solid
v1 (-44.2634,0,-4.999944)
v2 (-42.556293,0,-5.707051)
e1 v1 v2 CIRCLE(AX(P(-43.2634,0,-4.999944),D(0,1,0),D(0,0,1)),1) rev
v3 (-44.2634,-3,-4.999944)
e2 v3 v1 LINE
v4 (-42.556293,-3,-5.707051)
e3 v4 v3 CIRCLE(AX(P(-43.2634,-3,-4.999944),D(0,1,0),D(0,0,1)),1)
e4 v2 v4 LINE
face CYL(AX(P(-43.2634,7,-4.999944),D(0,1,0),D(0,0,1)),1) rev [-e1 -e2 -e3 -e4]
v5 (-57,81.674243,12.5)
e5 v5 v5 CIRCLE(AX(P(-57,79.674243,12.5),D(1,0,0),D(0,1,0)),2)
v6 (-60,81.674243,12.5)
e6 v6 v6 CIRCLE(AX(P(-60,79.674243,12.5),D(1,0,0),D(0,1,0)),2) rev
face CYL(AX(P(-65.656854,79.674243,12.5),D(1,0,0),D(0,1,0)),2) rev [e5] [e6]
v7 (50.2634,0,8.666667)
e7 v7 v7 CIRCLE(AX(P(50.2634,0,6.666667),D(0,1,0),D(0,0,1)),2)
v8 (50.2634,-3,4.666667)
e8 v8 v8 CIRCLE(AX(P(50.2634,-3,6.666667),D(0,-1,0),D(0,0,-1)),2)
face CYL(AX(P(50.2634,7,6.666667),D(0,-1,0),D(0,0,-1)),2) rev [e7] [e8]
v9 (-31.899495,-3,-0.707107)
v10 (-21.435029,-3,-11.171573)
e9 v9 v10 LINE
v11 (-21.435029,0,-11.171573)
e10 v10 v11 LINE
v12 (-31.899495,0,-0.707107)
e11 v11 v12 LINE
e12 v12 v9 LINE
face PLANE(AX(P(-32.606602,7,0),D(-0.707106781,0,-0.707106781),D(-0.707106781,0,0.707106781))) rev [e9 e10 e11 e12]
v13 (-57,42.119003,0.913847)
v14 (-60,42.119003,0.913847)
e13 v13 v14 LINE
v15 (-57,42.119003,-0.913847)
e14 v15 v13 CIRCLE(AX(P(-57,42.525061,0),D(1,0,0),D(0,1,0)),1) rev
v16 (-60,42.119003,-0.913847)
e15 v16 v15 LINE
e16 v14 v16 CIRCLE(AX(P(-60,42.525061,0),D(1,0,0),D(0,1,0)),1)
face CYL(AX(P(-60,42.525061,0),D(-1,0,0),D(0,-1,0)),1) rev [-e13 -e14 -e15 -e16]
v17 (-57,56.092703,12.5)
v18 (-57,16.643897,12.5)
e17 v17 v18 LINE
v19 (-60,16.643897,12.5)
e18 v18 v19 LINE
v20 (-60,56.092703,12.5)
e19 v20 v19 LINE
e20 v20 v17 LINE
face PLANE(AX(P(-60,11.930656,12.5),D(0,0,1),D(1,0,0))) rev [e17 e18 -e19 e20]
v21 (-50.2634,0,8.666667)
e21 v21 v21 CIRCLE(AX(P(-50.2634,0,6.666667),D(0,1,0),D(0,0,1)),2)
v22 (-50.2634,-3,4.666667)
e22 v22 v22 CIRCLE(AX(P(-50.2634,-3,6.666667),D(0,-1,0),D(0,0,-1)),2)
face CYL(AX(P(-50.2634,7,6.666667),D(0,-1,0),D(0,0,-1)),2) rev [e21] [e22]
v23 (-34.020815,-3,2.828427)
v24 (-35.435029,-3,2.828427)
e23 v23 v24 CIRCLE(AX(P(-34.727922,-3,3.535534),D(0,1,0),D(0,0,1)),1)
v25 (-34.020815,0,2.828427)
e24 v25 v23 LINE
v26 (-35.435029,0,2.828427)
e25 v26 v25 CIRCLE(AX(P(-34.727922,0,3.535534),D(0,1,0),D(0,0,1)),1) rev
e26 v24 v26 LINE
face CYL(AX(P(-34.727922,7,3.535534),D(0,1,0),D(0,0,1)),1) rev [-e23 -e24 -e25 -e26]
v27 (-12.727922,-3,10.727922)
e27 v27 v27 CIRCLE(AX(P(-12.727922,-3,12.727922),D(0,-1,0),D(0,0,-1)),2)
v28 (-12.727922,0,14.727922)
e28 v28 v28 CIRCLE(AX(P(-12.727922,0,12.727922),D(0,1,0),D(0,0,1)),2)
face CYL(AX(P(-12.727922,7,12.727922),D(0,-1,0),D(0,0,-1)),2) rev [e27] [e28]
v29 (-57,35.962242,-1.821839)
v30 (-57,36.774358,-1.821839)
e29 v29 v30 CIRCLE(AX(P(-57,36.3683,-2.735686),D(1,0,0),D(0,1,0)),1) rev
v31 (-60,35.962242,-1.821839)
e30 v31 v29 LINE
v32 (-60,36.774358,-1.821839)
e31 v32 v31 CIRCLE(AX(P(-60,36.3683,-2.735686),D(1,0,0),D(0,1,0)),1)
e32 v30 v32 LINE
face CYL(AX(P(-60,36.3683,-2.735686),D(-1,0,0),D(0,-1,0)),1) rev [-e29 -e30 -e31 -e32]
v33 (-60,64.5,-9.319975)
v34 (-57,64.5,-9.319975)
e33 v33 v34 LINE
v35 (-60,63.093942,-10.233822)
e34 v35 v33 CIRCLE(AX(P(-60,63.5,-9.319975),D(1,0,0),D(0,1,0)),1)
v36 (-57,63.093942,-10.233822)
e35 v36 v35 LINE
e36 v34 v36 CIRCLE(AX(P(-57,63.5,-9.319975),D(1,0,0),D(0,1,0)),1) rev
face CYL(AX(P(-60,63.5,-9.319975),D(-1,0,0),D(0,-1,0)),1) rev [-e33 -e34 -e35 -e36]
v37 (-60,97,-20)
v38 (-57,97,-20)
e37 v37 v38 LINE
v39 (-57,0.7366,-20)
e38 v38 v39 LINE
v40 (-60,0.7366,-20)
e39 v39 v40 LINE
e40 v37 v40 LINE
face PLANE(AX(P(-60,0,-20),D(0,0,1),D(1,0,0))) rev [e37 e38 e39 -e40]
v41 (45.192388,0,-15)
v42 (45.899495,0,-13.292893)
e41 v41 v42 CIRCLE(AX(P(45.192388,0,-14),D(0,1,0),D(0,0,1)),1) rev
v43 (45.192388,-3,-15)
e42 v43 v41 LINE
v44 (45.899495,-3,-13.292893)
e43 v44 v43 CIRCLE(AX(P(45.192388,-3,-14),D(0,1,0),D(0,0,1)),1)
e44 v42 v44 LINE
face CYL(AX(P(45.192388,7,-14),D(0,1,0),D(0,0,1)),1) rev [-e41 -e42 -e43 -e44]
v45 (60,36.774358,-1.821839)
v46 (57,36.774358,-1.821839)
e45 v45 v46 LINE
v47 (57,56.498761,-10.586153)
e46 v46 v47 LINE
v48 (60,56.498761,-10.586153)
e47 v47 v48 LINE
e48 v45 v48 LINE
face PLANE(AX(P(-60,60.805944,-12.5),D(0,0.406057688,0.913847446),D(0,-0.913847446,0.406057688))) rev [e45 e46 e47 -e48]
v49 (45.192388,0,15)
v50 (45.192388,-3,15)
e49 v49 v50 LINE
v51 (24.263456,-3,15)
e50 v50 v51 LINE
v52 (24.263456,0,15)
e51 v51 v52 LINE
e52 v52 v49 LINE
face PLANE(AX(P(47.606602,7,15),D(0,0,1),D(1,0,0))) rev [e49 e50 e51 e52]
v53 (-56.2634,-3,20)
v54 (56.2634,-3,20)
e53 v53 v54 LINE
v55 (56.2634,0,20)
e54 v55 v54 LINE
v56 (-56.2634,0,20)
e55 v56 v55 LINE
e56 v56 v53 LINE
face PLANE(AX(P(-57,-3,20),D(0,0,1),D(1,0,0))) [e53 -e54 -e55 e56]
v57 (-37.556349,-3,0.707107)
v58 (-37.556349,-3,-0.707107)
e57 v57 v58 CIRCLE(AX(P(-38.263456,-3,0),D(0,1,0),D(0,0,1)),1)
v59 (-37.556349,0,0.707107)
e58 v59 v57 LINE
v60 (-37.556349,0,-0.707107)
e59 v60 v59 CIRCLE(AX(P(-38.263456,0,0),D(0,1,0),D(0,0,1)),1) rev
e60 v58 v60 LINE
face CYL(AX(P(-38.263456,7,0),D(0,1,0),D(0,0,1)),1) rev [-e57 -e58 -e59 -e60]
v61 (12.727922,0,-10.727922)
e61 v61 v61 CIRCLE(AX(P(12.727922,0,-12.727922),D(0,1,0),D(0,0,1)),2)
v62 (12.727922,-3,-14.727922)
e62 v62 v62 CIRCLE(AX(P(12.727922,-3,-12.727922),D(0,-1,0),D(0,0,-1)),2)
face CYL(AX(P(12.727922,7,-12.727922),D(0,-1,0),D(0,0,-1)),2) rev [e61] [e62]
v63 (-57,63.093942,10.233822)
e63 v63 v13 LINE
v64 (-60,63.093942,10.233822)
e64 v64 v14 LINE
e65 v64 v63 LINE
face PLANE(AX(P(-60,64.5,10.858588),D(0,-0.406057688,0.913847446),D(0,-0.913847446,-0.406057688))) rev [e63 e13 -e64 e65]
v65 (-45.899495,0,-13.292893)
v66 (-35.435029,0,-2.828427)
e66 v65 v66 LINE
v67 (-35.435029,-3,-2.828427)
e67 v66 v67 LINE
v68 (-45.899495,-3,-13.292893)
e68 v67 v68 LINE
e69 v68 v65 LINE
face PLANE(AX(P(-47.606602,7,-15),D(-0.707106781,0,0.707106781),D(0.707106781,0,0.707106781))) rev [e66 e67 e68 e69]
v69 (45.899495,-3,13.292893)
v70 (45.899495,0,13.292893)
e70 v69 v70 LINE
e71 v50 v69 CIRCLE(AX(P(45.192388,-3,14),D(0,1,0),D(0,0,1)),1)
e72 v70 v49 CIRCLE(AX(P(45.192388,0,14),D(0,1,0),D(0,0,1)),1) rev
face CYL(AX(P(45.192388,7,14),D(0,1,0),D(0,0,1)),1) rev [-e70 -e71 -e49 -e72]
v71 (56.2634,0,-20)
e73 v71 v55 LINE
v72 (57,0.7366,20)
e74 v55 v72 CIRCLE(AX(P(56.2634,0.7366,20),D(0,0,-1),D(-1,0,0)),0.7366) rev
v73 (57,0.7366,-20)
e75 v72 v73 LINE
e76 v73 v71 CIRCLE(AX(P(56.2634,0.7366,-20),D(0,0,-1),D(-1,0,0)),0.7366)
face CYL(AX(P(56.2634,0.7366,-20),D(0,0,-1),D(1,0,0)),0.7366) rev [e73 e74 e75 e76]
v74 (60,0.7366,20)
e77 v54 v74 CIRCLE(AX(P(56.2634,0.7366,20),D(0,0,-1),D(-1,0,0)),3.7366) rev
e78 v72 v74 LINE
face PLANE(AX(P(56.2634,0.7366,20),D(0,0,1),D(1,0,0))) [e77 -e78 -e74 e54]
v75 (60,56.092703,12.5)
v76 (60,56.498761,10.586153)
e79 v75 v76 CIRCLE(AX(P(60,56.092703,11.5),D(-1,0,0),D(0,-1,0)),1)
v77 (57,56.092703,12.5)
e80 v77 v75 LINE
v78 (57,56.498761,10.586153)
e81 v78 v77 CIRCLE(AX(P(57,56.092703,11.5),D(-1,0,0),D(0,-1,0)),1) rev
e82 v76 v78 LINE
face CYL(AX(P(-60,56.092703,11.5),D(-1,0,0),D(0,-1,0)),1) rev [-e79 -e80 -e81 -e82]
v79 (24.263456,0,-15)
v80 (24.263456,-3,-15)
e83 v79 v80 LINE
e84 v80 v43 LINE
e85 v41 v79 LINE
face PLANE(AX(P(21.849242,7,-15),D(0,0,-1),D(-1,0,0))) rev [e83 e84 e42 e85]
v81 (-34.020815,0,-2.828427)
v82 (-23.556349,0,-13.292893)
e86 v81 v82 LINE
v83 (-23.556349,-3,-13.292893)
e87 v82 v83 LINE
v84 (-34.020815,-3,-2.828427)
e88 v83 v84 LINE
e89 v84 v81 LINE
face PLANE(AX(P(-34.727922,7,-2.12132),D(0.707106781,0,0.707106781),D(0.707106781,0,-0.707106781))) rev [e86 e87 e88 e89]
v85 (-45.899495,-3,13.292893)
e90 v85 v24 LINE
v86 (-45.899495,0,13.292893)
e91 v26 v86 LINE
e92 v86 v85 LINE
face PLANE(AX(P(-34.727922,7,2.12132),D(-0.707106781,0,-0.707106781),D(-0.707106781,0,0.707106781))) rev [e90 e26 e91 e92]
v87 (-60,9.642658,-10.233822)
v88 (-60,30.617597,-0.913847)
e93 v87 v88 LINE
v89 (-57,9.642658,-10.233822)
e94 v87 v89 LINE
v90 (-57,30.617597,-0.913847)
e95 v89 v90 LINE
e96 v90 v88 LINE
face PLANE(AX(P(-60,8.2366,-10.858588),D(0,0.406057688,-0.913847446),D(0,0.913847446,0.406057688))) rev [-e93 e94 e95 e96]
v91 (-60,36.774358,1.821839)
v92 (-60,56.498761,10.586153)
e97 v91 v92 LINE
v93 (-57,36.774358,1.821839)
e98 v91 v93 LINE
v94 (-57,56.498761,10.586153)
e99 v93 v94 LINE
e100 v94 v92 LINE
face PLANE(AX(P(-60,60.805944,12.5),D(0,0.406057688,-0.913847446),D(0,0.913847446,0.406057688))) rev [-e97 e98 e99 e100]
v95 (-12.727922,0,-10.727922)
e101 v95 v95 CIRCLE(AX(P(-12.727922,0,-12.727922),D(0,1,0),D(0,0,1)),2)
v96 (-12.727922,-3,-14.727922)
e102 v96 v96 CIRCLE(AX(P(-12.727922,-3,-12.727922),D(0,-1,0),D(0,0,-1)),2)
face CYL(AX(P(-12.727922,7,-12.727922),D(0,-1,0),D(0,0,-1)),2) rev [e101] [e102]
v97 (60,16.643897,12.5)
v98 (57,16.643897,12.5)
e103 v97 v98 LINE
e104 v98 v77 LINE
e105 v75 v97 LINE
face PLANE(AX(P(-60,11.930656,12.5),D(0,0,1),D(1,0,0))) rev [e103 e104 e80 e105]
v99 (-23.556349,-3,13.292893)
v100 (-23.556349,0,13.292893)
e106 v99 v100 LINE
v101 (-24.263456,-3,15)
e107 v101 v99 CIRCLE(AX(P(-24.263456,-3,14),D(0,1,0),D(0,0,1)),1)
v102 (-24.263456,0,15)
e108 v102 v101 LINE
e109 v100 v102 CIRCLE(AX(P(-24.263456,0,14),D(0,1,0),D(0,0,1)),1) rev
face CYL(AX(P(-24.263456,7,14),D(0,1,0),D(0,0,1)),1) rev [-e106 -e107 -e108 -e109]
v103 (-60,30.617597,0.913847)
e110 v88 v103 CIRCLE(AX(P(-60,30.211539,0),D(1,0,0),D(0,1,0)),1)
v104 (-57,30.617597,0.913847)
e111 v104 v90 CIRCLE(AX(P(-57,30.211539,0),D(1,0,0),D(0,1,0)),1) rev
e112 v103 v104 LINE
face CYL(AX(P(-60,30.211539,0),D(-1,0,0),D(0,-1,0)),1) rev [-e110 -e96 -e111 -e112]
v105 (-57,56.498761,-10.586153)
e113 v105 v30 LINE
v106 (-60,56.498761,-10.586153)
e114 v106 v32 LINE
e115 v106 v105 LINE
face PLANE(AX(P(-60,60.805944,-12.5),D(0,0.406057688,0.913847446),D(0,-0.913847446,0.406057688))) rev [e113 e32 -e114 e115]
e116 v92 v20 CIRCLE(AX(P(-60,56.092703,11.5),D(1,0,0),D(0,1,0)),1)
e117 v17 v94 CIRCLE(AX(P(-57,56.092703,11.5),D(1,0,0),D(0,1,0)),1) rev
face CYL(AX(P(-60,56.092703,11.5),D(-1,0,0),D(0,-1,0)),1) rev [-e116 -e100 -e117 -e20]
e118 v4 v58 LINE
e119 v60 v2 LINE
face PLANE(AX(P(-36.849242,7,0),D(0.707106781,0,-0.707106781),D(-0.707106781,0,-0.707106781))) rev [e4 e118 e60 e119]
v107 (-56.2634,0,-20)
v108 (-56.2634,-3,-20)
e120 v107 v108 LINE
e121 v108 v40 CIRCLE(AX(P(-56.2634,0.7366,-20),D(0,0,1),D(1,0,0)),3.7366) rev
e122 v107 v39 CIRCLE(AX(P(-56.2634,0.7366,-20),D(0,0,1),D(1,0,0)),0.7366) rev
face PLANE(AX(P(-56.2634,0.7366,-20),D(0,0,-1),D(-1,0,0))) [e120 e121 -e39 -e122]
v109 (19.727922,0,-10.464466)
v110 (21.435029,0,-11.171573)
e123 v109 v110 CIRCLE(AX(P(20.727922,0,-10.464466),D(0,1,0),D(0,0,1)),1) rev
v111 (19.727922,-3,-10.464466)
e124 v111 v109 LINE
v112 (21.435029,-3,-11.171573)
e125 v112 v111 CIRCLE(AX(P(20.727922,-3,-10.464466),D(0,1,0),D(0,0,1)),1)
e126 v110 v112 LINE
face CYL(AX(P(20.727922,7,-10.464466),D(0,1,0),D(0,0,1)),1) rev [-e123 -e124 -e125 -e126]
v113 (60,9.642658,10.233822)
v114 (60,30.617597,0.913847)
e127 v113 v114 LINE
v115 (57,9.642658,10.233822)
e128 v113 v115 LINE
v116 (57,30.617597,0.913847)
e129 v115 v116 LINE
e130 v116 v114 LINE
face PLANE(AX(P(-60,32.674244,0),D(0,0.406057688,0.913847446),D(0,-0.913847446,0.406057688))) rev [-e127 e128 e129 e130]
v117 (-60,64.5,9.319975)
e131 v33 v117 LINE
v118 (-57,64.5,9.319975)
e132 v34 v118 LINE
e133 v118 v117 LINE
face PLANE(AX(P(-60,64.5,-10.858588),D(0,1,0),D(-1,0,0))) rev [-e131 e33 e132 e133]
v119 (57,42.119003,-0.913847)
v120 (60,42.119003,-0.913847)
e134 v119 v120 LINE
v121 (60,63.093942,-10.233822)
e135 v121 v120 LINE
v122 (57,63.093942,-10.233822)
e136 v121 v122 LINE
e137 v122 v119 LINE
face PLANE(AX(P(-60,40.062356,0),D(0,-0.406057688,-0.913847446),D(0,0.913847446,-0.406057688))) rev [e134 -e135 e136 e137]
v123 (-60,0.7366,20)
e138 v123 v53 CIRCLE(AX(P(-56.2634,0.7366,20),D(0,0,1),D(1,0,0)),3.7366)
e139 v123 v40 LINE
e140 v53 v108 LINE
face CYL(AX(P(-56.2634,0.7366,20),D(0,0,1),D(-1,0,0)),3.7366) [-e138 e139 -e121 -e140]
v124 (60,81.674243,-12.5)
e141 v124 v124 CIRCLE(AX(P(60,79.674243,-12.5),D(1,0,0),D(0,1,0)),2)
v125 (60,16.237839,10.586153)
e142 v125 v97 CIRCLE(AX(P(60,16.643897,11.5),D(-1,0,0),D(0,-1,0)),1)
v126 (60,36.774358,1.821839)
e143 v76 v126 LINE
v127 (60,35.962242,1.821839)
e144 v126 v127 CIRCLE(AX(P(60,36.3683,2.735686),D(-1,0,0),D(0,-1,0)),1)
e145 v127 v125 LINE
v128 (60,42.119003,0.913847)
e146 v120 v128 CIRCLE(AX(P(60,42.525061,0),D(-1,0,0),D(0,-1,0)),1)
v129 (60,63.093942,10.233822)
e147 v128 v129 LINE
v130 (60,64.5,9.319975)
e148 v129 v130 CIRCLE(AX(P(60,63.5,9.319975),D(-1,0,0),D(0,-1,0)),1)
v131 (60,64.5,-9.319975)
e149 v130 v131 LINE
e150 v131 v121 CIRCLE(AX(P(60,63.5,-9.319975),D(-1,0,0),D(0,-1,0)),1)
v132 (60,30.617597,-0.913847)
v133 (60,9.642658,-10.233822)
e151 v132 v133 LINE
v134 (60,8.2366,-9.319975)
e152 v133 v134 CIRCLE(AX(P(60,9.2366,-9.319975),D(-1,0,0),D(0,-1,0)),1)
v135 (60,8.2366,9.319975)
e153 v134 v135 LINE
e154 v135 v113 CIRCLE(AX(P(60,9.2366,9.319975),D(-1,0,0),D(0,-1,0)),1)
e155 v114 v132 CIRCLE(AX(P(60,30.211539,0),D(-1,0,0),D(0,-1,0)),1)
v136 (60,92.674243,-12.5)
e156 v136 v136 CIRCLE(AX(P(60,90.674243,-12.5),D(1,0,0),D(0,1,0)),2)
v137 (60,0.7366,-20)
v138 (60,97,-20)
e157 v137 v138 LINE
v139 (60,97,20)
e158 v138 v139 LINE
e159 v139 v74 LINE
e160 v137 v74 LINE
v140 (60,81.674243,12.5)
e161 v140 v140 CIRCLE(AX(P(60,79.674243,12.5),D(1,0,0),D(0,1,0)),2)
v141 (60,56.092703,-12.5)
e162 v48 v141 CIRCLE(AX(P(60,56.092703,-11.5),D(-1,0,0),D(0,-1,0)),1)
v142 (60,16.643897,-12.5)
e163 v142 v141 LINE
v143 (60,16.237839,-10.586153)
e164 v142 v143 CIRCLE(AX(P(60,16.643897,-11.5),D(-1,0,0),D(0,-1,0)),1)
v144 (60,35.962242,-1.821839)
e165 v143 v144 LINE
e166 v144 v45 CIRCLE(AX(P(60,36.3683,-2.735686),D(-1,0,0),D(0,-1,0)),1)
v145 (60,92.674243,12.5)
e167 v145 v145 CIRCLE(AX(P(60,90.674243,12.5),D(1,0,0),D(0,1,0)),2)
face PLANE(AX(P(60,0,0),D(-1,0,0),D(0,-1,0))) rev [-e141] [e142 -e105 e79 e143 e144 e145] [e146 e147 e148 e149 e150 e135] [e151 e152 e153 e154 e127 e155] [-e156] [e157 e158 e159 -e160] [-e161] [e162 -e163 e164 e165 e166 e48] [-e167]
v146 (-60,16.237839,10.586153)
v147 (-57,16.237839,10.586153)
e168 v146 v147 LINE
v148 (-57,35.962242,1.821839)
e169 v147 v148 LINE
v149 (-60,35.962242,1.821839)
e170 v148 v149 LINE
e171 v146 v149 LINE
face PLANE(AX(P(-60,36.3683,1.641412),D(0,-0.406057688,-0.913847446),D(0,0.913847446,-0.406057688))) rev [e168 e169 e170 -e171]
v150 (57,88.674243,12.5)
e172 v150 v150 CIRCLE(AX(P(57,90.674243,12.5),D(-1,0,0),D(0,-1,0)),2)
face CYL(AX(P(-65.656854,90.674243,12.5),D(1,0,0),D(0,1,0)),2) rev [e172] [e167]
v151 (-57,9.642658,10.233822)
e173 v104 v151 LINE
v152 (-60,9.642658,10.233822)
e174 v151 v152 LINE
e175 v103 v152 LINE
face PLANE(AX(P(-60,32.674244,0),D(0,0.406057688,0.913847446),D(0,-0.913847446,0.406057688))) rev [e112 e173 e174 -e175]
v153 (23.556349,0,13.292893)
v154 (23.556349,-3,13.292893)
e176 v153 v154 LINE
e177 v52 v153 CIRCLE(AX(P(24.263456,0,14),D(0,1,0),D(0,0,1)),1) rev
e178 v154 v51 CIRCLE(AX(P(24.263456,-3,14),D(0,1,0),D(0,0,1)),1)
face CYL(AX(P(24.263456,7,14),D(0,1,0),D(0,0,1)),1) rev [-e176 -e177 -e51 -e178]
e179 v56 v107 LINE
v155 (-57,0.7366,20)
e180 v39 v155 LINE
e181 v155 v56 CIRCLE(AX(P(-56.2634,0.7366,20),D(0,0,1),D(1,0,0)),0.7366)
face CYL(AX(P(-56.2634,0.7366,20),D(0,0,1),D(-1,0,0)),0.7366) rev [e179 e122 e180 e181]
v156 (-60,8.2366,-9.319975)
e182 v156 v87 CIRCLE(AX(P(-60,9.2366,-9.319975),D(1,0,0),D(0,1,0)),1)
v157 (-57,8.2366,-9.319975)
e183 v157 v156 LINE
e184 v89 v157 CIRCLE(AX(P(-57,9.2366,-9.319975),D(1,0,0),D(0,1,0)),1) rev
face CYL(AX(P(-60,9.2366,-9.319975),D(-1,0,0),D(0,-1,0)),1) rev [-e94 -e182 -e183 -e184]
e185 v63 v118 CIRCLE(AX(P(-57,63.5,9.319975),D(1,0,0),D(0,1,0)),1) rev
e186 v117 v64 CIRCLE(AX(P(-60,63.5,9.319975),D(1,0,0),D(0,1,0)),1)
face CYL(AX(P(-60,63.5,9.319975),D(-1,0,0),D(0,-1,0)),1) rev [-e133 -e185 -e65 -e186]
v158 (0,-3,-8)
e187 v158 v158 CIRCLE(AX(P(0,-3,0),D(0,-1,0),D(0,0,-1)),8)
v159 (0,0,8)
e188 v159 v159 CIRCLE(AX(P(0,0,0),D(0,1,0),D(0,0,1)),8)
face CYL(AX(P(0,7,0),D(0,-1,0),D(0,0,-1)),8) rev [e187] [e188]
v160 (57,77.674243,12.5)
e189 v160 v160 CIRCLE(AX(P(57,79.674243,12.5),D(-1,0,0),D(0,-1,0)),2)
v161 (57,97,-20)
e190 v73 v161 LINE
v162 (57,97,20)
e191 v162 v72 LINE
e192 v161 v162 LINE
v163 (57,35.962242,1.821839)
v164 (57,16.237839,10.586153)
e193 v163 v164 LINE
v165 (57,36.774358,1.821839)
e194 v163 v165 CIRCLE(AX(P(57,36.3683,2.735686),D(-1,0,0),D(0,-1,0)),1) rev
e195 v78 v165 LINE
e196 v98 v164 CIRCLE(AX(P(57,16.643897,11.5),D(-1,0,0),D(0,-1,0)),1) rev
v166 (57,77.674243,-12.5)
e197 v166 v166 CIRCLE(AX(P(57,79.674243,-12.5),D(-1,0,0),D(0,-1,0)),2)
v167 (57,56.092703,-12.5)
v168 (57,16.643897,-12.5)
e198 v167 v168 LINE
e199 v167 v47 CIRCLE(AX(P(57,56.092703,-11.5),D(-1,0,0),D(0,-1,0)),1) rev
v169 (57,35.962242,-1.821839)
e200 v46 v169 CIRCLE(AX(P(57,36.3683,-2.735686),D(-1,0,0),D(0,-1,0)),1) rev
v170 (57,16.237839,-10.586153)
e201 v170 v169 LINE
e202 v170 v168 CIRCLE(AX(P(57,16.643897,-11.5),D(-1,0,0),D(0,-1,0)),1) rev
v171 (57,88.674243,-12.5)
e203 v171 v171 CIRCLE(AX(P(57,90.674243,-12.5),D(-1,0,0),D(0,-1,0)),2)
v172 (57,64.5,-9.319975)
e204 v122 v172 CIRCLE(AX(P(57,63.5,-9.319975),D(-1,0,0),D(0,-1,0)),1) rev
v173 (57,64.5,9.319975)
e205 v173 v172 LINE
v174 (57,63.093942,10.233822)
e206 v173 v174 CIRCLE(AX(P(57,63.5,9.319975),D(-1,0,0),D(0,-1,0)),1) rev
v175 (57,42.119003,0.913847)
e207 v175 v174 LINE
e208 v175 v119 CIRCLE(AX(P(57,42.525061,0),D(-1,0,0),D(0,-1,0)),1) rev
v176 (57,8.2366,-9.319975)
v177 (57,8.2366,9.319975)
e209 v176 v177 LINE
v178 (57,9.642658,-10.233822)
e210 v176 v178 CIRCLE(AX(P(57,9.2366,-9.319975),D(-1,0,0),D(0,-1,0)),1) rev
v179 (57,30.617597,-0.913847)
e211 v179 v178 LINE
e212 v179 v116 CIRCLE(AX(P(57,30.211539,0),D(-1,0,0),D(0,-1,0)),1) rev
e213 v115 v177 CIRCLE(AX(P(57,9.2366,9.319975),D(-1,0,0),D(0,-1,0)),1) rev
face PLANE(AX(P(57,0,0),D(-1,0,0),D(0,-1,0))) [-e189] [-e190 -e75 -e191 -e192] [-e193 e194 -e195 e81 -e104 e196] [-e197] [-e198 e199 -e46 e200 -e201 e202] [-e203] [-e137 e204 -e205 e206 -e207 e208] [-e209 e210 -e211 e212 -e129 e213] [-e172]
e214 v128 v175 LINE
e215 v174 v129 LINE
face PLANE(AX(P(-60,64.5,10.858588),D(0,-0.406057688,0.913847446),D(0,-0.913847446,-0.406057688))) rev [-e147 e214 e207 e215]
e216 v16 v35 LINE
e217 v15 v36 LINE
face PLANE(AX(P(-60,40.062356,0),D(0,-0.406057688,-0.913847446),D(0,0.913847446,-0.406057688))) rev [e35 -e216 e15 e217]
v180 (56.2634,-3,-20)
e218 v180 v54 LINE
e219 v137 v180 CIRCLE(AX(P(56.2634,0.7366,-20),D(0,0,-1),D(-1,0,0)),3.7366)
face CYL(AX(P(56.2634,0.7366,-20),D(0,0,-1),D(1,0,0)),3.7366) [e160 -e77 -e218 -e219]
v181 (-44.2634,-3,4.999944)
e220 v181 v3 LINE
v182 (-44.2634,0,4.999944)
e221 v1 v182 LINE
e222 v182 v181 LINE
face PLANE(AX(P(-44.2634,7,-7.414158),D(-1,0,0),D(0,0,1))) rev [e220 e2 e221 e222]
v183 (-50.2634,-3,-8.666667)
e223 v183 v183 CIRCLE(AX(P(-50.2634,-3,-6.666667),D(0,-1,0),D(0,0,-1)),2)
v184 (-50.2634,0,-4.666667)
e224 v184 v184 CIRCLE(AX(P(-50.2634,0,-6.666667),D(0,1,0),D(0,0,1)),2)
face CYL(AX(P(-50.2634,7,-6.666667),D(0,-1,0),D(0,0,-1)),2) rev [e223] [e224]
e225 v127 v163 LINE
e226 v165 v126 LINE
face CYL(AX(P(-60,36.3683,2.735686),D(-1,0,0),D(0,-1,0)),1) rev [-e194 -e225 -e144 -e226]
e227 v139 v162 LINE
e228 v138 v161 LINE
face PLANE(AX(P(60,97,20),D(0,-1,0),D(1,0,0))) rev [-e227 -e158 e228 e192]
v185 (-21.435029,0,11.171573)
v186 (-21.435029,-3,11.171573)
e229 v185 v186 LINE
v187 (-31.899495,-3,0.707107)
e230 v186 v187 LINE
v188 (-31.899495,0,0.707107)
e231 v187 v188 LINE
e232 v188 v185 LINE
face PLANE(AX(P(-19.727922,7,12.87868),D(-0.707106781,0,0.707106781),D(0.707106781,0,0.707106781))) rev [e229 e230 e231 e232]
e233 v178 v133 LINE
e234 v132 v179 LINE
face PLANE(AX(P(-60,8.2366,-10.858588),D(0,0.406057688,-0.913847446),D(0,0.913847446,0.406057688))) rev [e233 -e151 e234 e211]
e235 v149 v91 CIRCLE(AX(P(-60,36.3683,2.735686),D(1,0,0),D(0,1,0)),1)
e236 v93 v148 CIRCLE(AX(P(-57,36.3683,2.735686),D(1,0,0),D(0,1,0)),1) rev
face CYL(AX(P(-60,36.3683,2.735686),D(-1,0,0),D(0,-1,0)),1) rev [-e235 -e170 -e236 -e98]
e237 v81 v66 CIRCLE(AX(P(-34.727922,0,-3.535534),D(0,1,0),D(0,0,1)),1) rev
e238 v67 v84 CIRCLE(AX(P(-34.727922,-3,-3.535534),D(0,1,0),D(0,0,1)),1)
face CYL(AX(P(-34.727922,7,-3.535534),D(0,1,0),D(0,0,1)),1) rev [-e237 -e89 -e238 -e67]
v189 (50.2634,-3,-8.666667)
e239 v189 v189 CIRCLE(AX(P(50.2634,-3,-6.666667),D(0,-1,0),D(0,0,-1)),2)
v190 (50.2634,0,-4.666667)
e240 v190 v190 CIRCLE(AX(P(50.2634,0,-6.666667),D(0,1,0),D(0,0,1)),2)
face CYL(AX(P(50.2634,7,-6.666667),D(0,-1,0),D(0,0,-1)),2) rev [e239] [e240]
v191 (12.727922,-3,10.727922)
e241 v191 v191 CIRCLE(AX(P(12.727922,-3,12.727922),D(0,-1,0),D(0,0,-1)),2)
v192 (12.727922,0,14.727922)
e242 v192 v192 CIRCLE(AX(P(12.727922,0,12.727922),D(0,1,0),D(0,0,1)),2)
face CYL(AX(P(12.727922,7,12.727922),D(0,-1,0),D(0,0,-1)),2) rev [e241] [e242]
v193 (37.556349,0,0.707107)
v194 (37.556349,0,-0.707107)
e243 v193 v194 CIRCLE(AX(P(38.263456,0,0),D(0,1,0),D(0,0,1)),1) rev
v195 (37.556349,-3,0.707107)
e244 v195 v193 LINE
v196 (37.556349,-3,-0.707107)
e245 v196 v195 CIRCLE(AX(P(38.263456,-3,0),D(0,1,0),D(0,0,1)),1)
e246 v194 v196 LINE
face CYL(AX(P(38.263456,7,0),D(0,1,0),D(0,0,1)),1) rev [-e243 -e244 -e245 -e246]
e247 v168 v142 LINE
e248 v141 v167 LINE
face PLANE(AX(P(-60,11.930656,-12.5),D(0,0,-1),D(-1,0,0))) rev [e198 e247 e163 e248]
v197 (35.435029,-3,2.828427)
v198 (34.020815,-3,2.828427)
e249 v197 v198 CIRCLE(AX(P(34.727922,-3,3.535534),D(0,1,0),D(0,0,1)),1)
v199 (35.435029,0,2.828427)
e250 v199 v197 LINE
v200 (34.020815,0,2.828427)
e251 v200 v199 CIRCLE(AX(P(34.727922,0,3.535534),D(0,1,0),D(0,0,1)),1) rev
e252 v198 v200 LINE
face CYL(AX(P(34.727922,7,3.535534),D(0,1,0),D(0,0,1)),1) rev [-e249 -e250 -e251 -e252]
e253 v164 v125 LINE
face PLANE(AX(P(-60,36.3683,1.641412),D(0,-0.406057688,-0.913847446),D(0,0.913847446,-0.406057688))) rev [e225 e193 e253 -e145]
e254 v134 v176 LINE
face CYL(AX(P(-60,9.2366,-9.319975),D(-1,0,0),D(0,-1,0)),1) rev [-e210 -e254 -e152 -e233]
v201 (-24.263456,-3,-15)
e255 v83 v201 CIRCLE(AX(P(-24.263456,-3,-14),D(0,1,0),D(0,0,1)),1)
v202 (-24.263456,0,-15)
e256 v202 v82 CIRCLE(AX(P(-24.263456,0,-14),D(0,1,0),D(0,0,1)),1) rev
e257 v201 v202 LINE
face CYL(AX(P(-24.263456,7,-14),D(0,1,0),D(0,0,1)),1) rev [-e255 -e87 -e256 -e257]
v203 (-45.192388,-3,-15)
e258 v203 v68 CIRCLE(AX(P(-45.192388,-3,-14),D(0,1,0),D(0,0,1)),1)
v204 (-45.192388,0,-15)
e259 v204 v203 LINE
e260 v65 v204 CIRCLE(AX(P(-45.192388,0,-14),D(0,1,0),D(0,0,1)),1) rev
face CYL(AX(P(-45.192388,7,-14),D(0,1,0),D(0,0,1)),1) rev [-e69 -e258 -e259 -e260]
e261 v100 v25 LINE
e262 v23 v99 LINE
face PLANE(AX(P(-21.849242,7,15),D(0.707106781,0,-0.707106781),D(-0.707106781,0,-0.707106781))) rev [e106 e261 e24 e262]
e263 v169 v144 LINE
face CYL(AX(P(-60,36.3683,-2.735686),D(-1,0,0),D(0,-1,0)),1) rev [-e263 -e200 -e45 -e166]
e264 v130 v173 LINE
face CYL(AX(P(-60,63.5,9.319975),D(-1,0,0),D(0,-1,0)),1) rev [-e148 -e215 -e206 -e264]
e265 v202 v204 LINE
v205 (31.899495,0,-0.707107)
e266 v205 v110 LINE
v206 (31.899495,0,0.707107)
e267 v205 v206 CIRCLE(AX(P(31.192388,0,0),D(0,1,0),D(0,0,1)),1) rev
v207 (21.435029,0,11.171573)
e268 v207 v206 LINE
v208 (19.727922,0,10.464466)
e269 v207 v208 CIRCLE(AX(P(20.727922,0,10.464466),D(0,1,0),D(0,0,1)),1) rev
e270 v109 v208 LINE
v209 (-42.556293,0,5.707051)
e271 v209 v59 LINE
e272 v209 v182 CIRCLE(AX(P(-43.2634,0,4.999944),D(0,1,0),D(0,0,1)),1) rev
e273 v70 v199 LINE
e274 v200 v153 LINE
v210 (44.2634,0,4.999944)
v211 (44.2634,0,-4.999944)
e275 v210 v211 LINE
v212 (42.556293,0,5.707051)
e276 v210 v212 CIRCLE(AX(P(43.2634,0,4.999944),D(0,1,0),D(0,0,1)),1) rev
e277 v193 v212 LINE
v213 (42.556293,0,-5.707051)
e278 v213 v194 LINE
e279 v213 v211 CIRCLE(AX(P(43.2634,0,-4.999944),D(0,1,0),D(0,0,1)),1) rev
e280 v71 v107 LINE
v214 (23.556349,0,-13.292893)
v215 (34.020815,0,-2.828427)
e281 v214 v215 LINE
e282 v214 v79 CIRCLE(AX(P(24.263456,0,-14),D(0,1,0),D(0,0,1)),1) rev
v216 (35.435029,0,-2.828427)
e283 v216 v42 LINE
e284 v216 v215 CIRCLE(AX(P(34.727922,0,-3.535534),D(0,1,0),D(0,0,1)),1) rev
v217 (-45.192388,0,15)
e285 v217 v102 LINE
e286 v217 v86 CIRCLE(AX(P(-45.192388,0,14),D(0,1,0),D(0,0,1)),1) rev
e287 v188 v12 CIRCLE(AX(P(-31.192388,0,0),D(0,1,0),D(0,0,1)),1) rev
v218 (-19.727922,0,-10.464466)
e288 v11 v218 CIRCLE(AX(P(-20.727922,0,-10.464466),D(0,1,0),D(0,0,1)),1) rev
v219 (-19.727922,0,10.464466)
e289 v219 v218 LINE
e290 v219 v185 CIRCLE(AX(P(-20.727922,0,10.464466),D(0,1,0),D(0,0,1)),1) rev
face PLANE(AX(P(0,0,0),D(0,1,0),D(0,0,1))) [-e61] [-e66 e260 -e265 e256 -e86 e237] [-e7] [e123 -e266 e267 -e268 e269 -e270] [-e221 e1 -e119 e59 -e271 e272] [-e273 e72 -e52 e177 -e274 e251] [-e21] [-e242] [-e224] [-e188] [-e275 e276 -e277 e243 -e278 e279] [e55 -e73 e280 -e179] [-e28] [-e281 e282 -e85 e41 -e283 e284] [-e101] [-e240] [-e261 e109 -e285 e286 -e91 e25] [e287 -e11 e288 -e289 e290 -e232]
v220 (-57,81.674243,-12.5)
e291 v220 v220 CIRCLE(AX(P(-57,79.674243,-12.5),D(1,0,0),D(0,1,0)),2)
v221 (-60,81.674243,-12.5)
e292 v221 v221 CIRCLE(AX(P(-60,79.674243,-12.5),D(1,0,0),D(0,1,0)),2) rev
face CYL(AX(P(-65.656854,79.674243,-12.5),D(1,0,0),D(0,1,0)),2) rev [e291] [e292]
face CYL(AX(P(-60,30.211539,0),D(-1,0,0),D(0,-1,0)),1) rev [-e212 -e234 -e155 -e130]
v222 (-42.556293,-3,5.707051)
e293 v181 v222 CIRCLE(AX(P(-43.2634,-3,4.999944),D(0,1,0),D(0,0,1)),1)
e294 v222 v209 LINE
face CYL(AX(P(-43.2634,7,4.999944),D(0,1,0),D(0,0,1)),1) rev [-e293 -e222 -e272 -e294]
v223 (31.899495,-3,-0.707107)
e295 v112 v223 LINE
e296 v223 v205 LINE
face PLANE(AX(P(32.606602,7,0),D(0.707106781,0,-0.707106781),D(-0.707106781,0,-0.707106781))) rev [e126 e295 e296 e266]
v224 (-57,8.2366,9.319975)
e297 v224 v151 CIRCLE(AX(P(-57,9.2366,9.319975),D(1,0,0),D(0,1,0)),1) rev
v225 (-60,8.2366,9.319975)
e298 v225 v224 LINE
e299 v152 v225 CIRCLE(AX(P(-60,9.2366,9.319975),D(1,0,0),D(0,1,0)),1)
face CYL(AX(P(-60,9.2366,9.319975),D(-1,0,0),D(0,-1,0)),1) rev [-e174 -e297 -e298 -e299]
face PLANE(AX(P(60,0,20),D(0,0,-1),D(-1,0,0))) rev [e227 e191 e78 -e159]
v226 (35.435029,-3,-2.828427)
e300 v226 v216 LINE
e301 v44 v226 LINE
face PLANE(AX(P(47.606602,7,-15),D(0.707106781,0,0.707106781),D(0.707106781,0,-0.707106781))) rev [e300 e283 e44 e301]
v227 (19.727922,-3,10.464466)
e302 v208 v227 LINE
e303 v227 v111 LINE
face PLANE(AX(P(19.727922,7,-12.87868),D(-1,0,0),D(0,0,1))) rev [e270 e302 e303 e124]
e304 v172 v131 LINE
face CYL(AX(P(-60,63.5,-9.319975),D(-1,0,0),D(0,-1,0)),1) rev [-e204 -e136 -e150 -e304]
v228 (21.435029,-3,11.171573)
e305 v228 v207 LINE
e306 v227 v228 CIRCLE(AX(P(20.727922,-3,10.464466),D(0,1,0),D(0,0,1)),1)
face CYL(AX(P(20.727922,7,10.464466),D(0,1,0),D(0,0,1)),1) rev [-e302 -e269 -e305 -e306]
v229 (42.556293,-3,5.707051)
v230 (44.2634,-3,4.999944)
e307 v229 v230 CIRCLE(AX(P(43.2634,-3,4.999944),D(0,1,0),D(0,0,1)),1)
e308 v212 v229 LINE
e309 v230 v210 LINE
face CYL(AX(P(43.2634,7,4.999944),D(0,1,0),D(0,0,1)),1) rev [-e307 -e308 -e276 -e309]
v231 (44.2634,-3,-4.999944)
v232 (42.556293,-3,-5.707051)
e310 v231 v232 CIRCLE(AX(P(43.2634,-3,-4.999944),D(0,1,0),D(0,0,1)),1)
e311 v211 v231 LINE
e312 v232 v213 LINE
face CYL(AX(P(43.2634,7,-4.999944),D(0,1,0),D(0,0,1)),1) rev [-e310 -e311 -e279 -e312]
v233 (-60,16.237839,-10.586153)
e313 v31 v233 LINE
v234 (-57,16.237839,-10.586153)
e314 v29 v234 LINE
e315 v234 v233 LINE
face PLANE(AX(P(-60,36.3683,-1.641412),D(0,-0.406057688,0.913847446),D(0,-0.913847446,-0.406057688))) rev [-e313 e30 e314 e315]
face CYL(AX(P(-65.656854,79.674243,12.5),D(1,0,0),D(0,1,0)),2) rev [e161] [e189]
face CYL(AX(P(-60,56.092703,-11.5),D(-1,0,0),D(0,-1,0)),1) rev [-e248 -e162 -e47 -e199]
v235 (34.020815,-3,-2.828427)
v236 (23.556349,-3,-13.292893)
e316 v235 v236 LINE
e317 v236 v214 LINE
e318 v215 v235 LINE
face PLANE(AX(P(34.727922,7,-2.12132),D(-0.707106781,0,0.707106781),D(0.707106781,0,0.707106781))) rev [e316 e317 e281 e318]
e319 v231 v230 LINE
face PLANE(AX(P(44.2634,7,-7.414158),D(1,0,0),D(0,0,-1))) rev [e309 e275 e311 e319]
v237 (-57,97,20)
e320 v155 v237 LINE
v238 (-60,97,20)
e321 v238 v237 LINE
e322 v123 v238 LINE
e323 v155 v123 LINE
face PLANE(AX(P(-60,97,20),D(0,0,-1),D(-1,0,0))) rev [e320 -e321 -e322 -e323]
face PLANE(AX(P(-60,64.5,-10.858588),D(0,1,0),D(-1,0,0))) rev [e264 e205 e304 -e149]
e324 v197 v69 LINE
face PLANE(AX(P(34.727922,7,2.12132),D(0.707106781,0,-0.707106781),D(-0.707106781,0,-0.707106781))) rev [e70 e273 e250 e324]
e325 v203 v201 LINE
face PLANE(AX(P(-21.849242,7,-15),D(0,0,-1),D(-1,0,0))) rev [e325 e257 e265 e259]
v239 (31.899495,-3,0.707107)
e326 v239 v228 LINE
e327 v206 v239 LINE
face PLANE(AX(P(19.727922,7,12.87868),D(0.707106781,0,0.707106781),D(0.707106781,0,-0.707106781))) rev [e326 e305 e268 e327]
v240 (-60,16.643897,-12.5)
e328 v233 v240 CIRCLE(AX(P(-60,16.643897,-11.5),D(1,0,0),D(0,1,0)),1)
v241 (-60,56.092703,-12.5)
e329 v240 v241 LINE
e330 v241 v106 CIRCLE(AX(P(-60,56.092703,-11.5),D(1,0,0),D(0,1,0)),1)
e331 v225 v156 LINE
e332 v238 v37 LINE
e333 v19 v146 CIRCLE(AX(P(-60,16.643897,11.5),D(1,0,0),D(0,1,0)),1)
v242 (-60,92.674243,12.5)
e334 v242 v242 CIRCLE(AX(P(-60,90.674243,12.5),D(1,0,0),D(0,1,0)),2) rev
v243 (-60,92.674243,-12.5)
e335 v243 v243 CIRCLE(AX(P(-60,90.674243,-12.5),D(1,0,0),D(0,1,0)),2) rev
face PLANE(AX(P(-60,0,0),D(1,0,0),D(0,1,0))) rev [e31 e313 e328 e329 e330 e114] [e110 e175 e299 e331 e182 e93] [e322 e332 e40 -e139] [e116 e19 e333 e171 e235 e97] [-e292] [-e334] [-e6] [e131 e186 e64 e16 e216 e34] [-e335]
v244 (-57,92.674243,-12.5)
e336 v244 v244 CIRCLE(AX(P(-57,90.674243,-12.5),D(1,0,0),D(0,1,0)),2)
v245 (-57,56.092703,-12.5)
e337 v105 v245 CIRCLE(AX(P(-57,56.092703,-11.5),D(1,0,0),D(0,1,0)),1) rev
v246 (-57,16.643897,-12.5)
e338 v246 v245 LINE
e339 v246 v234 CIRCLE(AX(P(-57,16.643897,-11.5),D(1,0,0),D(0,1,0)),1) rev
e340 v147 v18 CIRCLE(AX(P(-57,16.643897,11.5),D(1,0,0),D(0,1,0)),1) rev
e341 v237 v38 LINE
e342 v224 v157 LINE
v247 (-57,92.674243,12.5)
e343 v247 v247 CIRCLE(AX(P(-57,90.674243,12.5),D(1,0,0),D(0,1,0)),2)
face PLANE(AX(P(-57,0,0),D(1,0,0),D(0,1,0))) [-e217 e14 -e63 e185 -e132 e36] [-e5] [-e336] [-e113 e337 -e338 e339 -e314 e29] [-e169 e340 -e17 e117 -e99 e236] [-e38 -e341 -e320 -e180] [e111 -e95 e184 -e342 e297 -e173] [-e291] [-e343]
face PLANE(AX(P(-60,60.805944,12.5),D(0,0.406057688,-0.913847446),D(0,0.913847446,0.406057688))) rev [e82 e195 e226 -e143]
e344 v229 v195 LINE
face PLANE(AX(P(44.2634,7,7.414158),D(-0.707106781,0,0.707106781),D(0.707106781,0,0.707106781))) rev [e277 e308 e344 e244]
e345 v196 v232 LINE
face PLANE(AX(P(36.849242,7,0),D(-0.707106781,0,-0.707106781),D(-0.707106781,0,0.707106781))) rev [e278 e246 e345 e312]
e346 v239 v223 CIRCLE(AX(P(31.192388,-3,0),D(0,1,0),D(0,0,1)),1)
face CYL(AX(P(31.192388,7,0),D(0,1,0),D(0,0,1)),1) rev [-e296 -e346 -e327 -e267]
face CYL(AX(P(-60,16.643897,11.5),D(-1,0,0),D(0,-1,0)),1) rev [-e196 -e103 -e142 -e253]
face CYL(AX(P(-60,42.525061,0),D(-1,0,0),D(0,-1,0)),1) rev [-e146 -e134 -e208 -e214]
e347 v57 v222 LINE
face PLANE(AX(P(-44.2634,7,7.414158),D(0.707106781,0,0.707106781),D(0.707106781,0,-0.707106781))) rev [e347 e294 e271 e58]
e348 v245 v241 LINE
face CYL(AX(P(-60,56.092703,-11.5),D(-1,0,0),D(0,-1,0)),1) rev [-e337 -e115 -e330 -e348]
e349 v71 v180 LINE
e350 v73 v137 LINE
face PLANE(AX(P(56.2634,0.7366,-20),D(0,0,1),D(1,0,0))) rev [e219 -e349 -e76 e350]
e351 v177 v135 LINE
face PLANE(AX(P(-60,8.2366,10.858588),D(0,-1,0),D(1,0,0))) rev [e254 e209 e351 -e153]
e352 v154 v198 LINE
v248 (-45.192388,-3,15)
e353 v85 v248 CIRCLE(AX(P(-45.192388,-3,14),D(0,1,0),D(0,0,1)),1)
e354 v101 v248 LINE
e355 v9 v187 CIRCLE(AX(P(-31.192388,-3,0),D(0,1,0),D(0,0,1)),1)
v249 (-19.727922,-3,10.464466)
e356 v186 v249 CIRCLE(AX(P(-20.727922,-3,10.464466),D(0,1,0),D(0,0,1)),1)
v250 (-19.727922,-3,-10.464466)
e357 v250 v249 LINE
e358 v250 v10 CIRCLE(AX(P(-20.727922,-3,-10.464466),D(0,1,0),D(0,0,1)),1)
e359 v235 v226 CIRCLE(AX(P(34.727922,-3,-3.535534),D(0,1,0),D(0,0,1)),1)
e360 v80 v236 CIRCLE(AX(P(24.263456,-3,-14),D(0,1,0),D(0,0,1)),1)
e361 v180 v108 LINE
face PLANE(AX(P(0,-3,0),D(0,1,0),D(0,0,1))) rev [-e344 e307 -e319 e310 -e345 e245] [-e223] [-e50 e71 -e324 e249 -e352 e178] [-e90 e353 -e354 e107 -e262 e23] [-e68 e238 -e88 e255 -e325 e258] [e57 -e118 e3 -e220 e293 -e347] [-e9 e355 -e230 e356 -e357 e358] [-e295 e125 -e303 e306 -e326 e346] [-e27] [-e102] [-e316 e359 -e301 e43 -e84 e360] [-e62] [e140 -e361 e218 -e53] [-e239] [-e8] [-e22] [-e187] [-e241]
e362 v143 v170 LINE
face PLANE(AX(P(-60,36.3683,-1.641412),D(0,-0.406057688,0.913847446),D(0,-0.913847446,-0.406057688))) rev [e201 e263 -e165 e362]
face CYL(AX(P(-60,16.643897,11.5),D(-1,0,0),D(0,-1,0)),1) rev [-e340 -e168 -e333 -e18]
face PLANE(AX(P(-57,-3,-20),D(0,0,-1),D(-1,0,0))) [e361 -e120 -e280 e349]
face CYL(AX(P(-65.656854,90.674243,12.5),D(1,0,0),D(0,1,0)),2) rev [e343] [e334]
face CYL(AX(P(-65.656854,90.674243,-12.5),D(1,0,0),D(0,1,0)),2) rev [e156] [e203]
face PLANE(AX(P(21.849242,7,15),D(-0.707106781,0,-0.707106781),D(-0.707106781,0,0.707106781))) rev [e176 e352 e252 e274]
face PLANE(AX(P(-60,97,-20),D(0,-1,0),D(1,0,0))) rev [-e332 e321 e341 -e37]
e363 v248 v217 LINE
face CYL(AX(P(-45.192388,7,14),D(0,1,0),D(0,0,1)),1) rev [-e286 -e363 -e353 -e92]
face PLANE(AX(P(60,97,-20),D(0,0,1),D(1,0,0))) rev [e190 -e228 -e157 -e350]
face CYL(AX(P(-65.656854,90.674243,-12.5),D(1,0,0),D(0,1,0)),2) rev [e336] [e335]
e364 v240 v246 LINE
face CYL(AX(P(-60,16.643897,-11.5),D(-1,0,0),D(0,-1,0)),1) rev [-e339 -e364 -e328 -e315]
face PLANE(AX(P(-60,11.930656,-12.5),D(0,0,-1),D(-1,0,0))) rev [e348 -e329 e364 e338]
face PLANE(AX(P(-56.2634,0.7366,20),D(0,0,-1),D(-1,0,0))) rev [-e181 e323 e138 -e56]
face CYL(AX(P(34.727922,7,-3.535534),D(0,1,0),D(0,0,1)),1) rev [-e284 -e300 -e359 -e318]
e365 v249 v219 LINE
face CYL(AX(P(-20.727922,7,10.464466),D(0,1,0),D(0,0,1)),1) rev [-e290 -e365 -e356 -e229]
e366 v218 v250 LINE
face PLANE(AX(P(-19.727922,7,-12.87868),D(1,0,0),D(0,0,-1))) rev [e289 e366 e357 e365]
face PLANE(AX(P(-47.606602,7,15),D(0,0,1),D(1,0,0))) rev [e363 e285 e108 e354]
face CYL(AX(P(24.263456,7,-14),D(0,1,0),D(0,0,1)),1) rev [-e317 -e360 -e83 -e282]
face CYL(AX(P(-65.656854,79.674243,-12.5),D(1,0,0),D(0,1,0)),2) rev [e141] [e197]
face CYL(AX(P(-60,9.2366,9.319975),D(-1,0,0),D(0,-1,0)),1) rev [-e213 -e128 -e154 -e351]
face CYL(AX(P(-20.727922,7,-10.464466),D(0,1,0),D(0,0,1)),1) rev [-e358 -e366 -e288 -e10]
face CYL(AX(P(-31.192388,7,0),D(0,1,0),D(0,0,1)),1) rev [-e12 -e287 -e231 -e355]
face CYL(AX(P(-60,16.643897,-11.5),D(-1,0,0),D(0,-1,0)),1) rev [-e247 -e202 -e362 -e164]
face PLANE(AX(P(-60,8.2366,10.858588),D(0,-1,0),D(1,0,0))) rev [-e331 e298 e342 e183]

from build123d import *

# Parameters (mm, degrees)
SKETCH3_W                    = 114
SKETCH3_H                    = 40
BASE_FLANGE1_DEPTH           = 3
EDGE_FLANGE1_STRIP_W         = 13.4732
EDGE_FLANGE1_STRIP_H         = 3
EDGE_FLANGE1_STRIP_CUT_DEPTH = 40
EDGE_FLANGE1_DEPTH           = 40
EDGE_FLANGE2_STRIP_W         = 13.4732
EDGE_FLANGE2_STRIP_H         = 3
EDGE_FLANGE2_STRIP_CUT_DEPTH = 40
EDGE_FLANGE2_DEPTH           = 40
SKETCH11_R                   = 8
SKETCH11_R_2                 = 2
CUT_EXTRUDE1_DEPTH           = 10
CUT_EXTRUDE2_REACH           = 157.592
SKETCH12_R                   = 2
CUT_EXTRUDE3_DEPTH           = 156.592416268
CUT_EXTRUDE3_DEPTH_BACK      = 156.592416268
CUT_EXTRUDE4_DEPTH           = 10
FILLET1_R                    = 1


# Sheet-metal steps are written as plain solids
with BuildPart() as part:
    # Sketch3 → Base-Flange1 (new body)
    with BuildSketch(Plane(origin=(0, 0, 0), x_dir=(1, 0, 0), z_dir=(0, 1, 0))):
        Rectangle(SKETCH3_W, SKETCH3_H)
    extrude(amount=-BASE_FLANGE1_DEPTH)

    # Edge-Flange1 strip (across the edge) → Edge-Flange1 strip cut (cut)
    with BuildSketch(Plane(origin=(-57, 0, -20), x_dir=(1, 0, 0), z_dir=(0, 0, 1))):
        with Locations((-6, -1.5)):
            Rectangle(EDGE_FLANGE1_STRIP_W, EDGE_FLANGE1_STRIP_H)
    extrude(amount=EDGE_FLANGE1_STRIP_CUT_DEPTH, mode=Mode.SUBTRACT)

    # Edge-Flange1 section (across the edge) → Edge-Flange1 (add)
    with BuildSketch(Plane(origin=(-57, 0, -20), x_dir=(1, 0, 0), z_dir=(0, 0, 1))):
        with BuildLine():
            Line((-3, 0.7366), (-3, 97))
            Line((-3, 97), (0, 97))
            Line((0, 97), (0, 0.7366))
            ThreePointArc((0, 0.7366), (0.215745145, 0.215745145), (0.7366, 0))
            Line((0.7366, 0), (0.7366, -3))
            ThreePointArc((0.7366, -3), (-1.905575199, -1.905575199), (-3, 0.7366))
        make_face()
    extrude(amount=EDGE_FLANGE1_DEPTH)

    # Edge-Flange2 strip (across the edge) → Edge-Flange2 strip cut (cut)
    with BuildSketch(Plane(origin=(57, 0, 20), x_dir=(-1, 0, 0), z_dir=(0, 0, -1))):
        with Locations((-6, -1.5)):
            Rectangle(EDGE_FLANGE2_STRIP_W, EDGE_FLANGE2_STRIP_H)
    extrude(amount=EDGE_FLANGE2_STRIP_CUT_DEPTH, mode=Mode.SUBTRACT)

    # Edge-Flange2 section (across the edge) → Edge-Flange2 (add)
    with BuildSketch(Plane(origin=(57, 0, 20), x_dir=(-1, 0, 0), z_dir=(0, 0, -1))):
        with BuildLine():
            Line((-3, 0.7366), (-3, 97))
            Line((-3, 97), (0, 97))
            Line((0, 97), (0, 0.7366))
            ThreePointArc((0, 0.7366), (0.215745145, 0.215745145), (0.7366, 0))
            Line((0.7366, 0), (0.7366, -3))
            ThreePointArc((0.7366, -3), (-1.905575199, -1.905575199), (-3, 0.7366))
        make_face()
    extrude(amount=EDGE_FLANGE2_DEPTH)

    # Sketch11 → Cut-Extrude1 (cut)
    with BuildSketch(Plane(origin=(0, -3, 0), x_dir=(-1, 0, 0), z_dir=(0, -1, 0))):
        with Locations(Location((0, 0, 0), (0, 0, 90))):
            Circle(SKETCH11_R)
        with Locations(Location((12.727922061, 12.727922061, 0), (0, 0, 90))):
            Circle(SKETCH11_R_2)
        with Locations(Location((12.727922061, -12.727922061, 0), (0, 0, 90))):
            Circle(SKETCH11_R_2)
        with Locations(Location((-12.727922061, -12.727922061, 0), (0, 0, 90))):
            Circle(SKETCH11_R_2)
        with Locations(Location((-12.727922061, 12.727922061, 0), (0, 0, 90))):
            Circle(SKETCH11_R_2)
        with Locations(Location((50.2634, 6.666666667, 0), (0, 0, 90))):
            Circle(SKETCH11_R_2)
        with Locations(Location((-50.2634, 6.666666667, 0), (0, 0, 90))):
            Circle(SKETCH11_R_2)
        with Locations(Location((50.2634, -6.666666667, 0), (0, 0, 90))):
            Circle(SKETCH11_R_2)
        with Locations(Location((-50.2634, -6.666666667, 0), (0, 0, 90))):
            Circle(SKETCH11_R_2)
    extrude(amount=-CUT_EXTRUDE1_DEPTH, mode=Mode.SUBTRACT)

    # Cut-Extrude2: up to this face of the body (flat: up to its plane)
    cut_extrude2_end = Plane(part.part.faces().sort_by_distance((-60, 48.8683, 0))[0])
    # Sketch12 → Cut-Extrude2 (cut, up to the picked face)
    with BuildSketch(Plane(origin=(60, 0, 0), x_dir=(0, 0, -1), z_dir=(1, 0, 0)), mode=Mode.PRIVATE) as cut_extrude2_sk1:
        with Locations(Location((12.5, 79.674243403, 0), (0, 0, 90))):
            Circle(SKETCH12_R)
    cut_extrude2_tool1 = split(extrude(cut_extrude2_sk1.sketch, amount=-CUT_EXTRUDE2_REACH, mode=Mode.PRIVATE), bisect_by=cut_extrude2_end, keep=Keep.BOTH, mode=Mode.PRIVATE)
    # Sketch12 → Cut-Extrude2 (cut, up to the picked face)
    with BuildSketch(Plane(origin=(60, 0, 0), x_dir=(0, 0, -1), z_dir=(1, 0, 0)), mode=Mode.PRIVATE) as cut_extrude2_sk2:
        with Locations(Location((12.5, 90.674243403, 0), (0, 0, 90))):
            Circle(SKETCH12_R)
    cut_extrude2_tool2 = split(extrude(cut_extrude2_sk2.sketch, amount=-CUT_EXTRUDE2_REACH, mode=Mode.PRIVATE), bisect_by=cut_extrude2_end, keep=Keep.BOTH, mode=Mode.PRIVATE)
    # Sketch12 → Cut-Extrude2 (cut, up to the picked face)
    with BuildSketch(Plane(origin=(60, 0, 0), x_dir=(0, 0, -1), z_dir=(1, 0, 0)), mode=Mode.PRIVATE) as cut_extrude2_sk3:
        with Locations(Location((-12.5, 79.674243403, 0), (0, 0, 90))):
            Circle(SKETCH12_R)
    cut_extrude2_tool3 = split(extrude(cut_extrude2_sk3.sketch, amount=-CUT_EXTRUDE2_REACH, mode=Mode.PRIVATE), bisect_by=cut_extrude2_end, keep=Keep.BOTH, mode=Mode.PRIVATE)
    # Sketch12 → Cut-Extrude2 (cut, up to the picked face)
    with BuildSketch(Plane(origin=(60, 0, 0), x_dir=(0, 0, -1), z_dir=(1, 0, 0)), mode=Mode.PRIVATE) as cut_extrude2_sk4:
        with Locations(Location((-12.5, 90.674243403, 0), (0, 0, 90))):
            Circle(SKETCH12_R)
    cut_extrude2_tool4 = split(extrude(cut_extrude2_sk4.sketch, amount=-CUT_EXTRUDE2_REACH, mode=Mode.PRIVATE), bisect_by=cut_extrude2_end, keep=Keep.BOTH, mode=Mode.PRIVATE)
    add(cut_extrude2_tool1.solids().sort_by(Axis((60, 79.674243, -12.5), (-1, 0, 0)))[0], mode=Mode.SUBTRACT)
    add(cut_extrude2_tool2.solids().sort_by(Axis((60, 90.674243, -12.5), (-1, 0, 0)))[0], mode=Mode.SUBTRACT)
    add(cut_extrude2_tool3.solids().sort_by(Axis((60, 79.674243, 12.5), (-1, 0, 0)))[0], mode=Mode.SUBTRACT)
    add(cut_extrude2_tool4.solids().sort_by(Axis((60, 90.674243, 12.5), (-1, 0, 0)))[0], mode=Mode.SUBTRACT)

    # Sketch14 → Cut-Extrude3 (cut, two sides: drawn at the far end of the back side and taken through both)
    with BuildSketch(Plane(origin=(60, 0, 0), x_dir=(0, 0, -1), z_dir=(1, 0, 0)).offset(-CUT_EXTRUDE3_DEPTH_BACK)):
        Polygon((-12.5, 60.805943605), (-1.641411821, 36.3683), (-12.5, 11.930656395), align=None)
        Polygon((-10.858588179, 64.5), (0, 40.062356395), (10.858588179, 64.5), align=None)
        Polygon((12.5, 60.805943605), (1.641411821, 36.3683), (12.5, 11.930656395), align=None)
        Polygon((10.858588179, 8.2366), (0, 32.674243605), (-10.858588179, 8.2366), align=None)
    extrude(amount=CUT_EXTRUDE3_DEPTH + CUT_EXTRUDE3_DEPTH_BACK, mode=Mode.SUBTRACT)

    # Sketch15 → Cut-Extrude4 (cut)
    with BuildSketch(Plane.XZ.offset(3)):
        Polygon((19.727922061, 12.878679656), (32.606601718, 0), (19.727922061, -12.878679656), align=None)
        Polygon((21.849242405, 15), (34.727922061, 2.121320344), (47.606601718, 15), align=None)
        Polygon((44.2634, 7.414157595), (36.849242405, 0), (44.2634, -7.414157595), align=None)
        Polygon((47.606601718, -15), (34.727922061, -2.121320344), (21.849242405, -15), align=None)
        Polygon((-21.849242405, -15), (-47.606601718, -15), (-34.727922061, -2.121320344), align=None)
        Polygon((-44.2634, -7.414157595), (-44.2634, 7.414157595), (-36.849242405, 0), align=None)
        Polygon((-47.606601718, 15), (-21.849242405, 15), (-34.727922061, 2.121320344), align=None)
        Polygon((-19.727922061, -12.878679656), (-19.727922061, 12.878679656), (-32.606601718, 0), align=None)
    extrude(amount=-CUT_EXTRUDE4_DEPTH, mode=Mode.SUBTRACT)

    # Fillet1
    fillet1_edges = [part.edges().sort_by_distance(p)[0] for p in [
        (58.5, 60.805943605, -12.5),
        (-58.5, 60.805943605, -12.5),
        (58.5, 11.930656395, -12.5),
        (-58.5, 11.930656395, -12.5),
        (58.5, 36.3683, -1.641411821),
        (-58.5, 36.3683, -1.641411821),
        (58.5, 64.5, 10.858588179),
        (-58.5, 64.5, 10.858588179),
        (58.5, 64.5, -10.858588179),
        (-58.5, 64.5, -10.858588179),
        (58.5, 40.062356395, 0),
        (-58.5, 40.062356395, 0),
        (58.5, 8.2366, -10.858588179),
        (-58.5, 8.2366, -10.858588179),
        (58.5, 8.2366, 10.858588179),
        (-58.5, 8.2366, 10.858588179),
        (58.5, 32.674243605, 0),
        (-58.5, 32.674243605, 0),
        (58.5, 11.930656395, 12.5),
        (-58.5, 11.930656395, 12.5),
        (58.5, 60.805943605, 12.5),
        (-58.5, 60.805943605, 12.5),
        (58.5, 36.3683, 1.641411821),
        (-58.5, 36.3683, 1.641411821),
        (-34.727922061, -1.5, -2.121320344),
        (-21.849242405, -1.5, -15),
        (-47.606601718, -1.5, -15),
        (47.606601718, -1.5, -15),
        (21.849242405, -1.5, -15),
        (34.727922061, -1.5, -2.121320344),
        (21.849242405, -1.5, 15),
        (47.606601718, -1.5, 15),
        (34.727922061, -1.5, 2.121320344),
        (44.2634, -1.5, 7.414157595),
        (44.2634, -1.5, -7.414157595),
        (36.849242405, -1.5, 0),
        (-19.727922061, -1.5, -12.878679656),
        (-32.606601718, -1.5, 0),
        (-19.727922061, -1.5, 12.878679656),
        (-36.849242405, -1.5, 0),
        (-44.2634, -1.5, -7.414157595),
        (-44.2634, -1.5, 7.414157595),
        (-34.727922061, -1.5, 2.121320344),
        (-47.606601718, -1.5, 15),
        (-21.849242405, -1.5, 15),
        (19.727922061, -1.5, -12.878679656),
        (19.727922061, -1.5, 12.878679656),
        (32.606601718, -1.5, 0),
    ]]
    fillet(fillet1_edges, radius=FILLET1_R)


solid = part.part
